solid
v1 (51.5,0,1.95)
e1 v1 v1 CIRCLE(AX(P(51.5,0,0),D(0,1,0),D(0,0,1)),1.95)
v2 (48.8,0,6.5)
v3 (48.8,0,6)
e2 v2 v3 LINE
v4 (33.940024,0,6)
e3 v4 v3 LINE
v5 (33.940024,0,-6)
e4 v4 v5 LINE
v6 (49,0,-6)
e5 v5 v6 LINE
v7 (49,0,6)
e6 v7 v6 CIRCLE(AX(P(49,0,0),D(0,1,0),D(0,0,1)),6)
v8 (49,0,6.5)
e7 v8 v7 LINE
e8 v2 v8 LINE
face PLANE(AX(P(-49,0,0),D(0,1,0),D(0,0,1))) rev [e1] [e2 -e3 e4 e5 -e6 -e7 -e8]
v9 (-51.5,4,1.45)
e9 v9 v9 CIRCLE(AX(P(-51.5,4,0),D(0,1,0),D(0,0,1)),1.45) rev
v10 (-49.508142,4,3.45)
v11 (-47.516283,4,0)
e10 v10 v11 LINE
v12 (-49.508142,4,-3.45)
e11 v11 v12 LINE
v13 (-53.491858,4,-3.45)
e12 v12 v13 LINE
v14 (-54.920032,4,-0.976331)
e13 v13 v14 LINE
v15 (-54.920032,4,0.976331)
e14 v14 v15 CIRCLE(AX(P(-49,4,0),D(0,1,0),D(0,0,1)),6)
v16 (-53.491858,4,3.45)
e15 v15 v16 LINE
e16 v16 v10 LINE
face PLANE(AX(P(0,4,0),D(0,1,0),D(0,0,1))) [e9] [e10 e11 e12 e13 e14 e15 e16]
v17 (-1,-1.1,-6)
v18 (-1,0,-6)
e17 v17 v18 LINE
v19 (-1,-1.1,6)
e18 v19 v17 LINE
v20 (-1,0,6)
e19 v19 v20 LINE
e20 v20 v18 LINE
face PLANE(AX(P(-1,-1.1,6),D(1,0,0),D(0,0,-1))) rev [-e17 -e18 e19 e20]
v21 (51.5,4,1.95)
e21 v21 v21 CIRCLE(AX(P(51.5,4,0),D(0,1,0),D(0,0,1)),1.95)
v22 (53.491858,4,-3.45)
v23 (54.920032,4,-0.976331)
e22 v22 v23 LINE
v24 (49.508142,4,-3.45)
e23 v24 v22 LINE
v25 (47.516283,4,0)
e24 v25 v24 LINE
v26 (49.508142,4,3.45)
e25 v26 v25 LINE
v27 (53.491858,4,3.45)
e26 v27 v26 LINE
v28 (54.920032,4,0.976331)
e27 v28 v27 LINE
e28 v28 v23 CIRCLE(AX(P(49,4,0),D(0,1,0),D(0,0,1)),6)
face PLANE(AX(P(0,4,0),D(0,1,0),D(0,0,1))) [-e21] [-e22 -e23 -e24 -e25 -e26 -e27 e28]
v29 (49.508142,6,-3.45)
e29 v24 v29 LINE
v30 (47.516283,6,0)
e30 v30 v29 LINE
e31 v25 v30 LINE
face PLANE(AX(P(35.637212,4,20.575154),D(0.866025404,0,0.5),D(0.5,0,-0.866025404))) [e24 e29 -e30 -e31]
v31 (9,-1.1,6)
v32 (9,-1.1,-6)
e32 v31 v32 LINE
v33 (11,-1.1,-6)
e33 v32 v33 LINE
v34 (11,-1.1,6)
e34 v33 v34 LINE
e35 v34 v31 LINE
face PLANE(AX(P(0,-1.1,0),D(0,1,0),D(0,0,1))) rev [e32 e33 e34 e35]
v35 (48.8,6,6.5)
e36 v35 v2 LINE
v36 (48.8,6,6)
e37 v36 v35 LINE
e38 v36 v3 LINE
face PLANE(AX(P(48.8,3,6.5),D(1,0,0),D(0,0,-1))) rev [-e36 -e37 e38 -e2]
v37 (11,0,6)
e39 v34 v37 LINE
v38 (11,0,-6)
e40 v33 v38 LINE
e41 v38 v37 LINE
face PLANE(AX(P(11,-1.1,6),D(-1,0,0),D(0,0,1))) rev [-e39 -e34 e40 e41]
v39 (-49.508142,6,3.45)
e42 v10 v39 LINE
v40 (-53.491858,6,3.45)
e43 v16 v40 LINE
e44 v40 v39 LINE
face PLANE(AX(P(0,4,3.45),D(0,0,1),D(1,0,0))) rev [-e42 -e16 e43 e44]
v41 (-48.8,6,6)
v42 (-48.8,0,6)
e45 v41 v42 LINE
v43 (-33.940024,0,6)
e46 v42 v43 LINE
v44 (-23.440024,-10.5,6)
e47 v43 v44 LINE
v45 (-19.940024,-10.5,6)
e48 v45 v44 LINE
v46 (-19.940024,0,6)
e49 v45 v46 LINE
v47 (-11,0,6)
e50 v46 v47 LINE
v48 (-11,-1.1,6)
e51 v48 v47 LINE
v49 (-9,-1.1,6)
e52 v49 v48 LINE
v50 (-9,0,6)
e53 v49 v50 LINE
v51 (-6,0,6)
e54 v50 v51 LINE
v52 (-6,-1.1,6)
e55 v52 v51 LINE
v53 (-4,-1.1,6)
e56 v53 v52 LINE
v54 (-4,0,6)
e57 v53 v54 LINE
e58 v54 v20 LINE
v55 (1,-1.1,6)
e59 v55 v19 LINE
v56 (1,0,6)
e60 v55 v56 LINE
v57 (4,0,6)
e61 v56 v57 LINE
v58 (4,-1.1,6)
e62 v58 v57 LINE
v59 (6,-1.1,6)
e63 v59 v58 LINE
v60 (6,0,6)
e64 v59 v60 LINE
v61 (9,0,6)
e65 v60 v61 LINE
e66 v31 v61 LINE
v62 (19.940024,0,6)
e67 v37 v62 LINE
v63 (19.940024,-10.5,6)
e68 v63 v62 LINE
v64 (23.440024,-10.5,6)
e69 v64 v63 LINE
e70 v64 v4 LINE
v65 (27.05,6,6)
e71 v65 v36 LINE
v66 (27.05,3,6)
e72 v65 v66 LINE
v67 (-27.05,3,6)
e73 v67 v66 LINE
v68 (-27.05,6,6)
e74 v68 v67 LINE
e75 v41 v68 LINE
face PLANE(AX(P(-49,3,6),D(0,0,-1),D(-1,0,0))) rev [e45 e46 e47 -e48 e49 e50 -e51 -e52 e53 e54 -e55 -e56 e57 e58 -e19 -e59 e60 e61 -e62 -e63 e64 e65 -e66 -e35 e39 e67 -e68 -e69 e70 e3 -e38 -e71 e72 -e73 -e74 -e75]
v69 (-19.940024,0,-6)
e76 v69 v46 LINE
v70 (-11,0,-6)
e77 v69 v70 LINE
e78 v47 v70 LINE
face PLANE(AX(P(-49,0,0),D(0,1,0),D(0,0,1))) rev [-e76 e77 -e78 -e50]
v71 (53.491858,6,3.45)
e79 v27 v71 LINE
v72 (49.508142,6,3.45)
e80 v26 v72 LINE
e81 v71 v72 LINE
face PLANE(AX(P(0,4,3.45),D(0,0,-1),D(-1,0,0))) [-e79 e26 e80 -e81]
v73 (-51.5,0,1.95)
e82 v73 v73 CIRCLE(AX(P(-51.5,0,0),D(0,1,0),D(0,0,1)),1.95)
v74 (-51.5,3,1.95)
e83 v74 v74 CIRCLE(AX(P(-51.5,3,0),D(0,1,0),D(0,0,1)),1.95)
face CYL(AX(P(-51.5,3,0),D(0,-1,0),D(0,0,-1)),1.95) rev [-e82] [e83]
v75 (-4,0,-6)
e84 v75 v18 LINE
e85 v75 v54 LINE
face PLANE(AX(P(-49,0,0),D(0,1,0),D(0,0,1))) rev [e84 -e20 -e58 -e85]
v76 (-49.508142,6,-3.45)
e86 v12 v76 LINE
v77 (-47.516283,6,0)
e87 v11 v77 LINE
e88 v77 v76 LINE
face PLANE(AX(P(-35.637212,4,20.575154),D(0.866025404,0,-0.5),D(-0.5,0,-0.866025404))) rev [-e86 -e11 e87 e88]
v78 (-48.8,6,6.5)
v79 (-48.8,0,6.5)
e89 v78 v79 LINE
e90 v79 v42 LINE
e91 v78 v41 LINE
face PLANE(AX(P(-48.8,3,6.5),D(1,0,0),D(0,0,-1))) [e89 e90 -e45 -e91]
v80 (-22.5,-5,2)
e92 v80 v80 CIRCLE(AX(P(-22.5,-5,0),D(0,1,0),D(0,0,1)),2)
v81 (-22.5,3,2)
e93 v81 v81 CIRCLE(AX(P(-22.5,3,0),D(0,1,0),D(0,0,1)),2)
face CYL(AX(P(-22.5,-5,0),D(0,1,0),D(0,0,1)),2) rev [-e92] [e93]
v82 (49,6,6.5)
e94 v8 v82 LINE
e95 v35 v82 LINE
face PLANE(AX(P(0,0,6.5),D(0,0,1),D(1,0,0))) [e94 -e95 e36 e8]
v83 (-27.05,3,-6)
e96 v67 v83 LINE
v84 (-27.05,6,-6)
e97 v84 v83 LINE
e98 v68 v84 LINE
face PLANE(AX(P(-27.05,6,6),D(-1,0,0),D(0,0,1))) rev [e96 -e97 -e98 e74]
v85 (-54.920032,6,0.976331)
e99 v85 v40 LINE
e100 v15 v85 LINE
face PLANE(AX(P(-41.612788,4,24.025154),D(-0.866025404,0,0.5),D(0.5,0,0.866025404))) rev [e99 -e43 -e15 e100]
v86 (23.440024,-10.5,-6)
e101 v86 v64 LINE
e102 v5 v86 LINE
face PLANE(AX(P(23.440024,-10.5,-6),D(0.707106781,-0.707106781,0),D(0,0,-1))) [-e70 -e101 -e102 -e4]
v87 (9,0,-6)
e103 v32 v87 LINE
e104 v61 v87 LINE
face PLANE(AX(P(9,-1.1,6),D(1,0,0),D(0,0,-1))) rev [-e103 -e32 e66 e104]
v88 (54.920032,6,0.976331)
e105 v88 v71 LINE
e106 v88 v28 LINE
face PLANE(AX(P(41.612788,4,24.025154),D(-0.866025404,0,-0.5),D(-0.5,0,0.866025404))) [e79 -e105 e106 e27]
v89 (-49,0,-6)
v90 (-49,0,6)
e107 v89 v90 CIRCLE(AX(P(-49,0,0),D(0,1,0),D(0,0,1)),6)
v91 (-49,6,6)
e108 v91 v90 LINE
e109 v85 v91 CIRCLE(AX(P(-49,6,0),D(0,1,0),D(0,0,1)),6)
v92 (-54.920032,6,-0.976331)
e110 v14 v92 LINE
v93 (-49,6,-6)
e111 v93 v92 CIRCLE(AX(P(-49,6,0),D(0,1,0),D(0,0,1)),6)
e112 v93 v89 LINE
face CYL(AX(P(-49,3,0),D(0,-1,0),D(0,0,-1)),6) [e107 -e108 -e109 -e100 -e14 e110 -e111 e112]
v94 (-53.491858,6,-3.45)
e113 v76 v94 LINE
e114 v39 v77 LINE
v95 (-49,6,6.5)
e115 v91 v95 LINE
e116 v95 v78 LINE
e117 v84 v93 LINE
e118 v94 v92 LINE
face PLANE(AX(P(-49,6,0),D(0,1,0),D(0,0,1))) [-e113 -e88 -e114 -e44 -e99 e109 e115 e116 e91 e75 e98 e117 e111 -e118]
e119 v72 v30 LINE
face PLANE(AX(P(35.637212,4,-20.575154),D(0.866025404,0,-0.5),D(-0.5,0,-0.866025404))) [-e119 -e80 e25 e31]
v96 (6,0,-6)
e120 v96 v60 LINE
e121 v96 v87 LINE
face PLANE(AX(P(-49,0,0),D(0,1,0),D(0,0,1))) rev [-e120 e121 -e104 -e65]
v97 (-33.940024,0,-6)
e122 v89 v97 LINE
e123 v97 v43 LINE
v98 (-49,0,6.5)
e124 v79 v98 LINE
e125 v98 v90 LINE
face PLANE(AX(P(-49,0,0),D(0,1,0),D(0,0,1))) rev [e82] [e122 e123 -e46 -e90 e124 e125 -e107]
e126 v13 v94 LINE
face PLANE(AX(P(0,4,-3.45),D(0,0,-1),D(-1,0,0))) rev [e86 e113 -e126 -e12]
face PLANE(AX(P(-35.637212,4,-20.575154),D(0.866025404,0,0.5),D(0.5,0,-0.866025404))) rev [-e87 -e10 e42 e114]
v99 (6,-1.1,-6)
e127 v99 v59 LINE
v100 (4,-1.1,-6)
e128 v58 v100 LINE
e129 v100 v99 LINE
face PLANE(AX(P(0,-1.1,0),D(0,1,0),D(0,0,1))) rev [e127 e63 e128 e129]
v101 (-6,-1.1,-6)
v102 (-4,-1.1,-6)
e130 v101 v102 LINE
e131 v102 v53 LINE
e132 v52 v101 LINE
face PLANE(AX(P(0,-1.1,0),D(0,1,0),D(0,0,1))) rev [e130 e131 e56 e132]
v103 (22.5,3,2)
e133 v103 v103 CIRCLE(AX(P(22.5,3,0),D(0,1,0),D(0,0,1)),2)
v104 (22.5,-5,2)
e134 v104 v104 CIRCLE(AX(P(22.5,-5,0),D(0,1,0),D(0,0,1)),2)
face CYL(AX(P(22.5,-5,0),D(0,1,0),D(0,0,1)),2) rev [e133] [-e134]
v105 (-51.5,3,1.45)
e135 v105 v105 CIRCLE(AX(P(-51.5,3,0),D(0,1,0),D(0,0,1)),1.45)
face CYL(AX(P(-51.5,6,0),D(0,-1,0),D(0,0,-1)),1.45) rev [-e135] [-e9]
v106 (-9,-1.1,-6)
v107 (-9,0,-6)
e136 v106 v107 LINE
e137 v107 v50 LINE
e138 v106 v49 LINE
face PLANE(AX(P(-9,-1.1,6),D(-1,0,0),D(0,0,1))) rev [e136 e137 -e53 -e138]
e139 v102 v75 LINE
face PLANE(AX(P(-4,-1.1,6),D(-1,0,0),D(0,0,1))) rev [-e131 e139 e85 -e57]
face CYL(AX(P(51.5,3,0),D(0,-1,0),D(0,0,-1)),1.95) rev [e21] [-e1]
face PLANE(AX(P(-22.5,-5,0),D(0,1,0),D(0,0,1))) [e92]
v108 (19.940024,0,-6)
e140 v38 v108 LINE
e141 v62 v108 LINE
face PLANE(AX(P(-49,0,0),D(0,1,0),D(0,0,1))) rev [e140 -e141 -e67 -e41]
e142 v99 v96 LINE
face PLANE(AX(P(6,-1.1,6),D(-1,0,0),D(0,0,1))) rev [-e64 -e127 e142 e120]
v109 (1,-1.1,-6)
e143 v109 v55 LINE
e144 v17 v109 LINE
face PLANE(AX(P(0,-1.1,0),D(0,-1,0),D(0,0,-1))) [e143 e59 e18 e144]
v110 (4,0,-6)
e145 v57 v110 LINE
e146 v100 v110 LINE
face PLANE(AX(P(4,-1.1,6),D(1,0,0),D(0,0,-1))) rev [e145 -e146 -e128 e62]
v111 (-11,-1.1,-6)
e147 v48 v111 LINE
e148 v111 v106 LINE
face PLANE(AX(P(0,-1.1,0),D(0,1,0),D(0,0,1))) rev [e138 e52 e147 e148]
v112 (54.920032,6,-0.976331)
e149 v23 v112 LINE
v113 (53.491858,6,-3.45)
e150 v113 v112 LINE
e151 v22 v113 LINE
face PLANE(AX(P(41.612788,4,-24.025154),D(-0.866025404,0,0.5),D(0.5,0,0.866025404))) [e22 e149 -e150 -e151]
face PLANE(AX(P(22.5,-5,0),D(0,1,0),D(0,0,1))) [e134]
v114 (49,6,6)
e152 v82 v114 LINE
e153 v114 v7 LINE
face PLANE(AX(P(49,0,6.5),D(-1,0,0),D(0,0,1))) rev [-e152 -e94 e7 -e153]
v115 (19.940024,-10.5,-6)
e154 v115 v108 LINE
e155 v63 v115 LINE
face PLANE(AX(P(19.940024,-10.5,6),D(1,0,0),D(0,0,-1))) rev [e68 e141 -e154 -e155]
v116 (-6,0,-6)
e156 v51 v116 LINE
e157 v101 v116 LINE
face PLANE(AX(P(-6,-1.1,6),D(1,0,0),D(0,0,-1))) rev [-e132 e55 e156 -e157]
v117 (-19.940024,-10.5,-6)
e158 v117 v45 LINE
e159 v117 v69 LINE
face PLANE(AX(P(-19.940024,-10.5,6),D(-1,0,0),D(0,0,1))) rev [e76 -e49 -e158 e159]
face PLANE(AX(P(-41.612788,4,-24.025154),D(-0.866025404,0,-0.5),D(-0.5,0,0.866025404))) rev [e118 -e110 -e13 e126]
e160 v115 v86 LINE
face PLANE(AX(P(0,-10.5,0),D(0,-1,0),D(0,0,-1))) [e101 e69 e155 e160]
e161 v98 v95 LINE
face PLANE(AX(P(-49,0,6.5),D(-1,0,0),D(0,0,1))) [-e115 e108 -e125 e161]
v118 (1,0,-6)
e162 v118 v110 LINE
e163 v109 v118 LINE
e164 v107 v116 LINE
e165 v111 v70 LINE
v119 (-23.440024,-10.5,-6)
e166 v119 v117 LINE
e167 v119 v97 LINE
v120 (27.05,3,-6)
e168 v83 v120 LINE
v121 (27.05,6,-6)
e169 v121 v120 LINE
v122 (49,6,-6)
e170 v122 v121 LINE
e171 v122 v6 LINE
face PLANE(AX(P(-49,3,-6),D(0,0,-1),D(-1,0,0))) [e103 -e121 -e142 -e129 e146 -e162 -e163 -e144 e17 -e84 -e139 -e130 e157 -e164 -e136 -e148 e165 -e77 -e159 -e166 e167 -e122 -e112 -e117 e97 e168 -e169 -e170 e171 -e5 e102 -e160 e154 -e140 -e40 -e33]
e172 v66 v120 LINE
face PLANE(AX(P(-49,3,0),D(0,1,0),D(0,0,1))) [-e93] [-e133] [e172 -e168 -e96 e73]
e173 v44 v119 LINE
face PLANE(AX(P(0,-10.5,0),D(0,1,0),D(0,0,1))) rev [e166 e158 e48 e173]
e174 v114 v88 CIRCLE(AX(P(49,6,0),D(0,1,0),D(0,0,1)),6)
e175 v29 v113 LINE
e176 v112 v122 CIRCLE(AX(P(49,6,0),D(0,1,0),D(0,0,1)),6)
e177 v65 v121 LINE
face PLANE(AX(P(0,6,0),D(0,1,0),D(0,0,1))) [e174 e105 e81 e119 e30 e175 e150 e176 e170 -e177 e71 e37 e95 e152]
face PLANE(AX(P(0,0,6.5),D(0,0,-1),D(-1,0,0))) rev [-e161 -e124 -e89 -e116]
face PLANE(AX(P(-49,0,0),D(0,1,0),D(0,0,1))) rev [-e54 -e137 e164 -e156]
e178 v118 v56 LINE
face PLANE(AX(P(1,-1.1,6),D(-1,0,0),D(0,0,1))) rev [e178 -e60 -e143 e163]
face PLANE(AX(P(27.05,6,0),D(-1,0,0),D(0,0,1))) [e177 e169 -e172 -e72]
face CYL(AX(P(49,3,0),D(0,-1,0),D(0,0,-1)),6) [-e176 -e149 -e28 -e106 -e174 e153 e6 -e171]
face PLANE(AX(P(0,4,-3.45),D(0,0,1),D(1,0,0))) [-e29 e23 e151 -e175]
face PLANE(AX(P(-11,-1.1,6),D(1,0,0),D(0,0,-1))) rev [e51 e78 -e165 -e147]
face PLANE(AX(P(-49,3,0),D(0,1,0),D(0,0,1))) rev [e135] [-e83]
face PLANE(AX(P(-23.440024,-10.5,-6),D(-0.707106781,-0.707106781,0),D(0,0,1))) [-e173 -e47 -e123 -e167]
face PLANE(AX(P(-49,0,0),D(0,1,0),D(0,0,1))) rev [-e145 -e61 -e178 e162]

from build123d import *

# Parameters (mm, degrees)
SKETCH1_R                 = 1.95
BOSS_EXTRUDE1_DEPTH       = 3
SKETCH4_W                 = 3.5
SKETCH4_H                 = 12
BOSS_EXTRUDE3_DEPTH       = 10.5
SKETCH5_W                 = 2
SKETCH5_H                 = 12
BOSS_EXTRUDE4_DEPTH       = 1.1
SKETCH6_W                 = 0.2
SKETCH6_H                 = 3
BOSS_EXTRUDE5_DEPTH       = 0.5
CHAMFER1_SIZE             = 10.5
BOSS_EXTRUDE6_OUTLINE_R   = 1.95
BOSS_EXTRUDE6_OUTLINE_R_2 = 1.45
BOSS_EXTRUDE6_DEPTH       = 3
CUT_EXTRUDE1_START        = -2
SKETCH11_R                = 1.45
CUT_EXTRUDE1_DEPTH        = 2
SKETCH13_R                = 2
CUT_EXTRUDE2_DEPTH        = 8


# Read off the part's stored shape, not the designer's step: Boss-Extrude6
with BuildPart() as part:
    # Sketch1 → Boss-Extrude1 (new body)
    with BuildSketch(Plane(origin=(0, 0, 0), x_dir=(1, 0, 0), z_dir=(0, 1, 0))):
        with BuildLine():
            Line((-49, 6), (49, 6))
            ThreePointArc((49, 6), (55, 0), (49, -6))
            Line((49, -6), (-49, -6))
            ThreePointArc((-49, -6), (-55, 0), (-49, 6))
        make_face()
        with Locations(Location((-51.5, 0, 0), (0, 0, 270))):
            Circle(SKETCH1_R, mode=Mode.SUBTRACT)
        with Locations(Location((51.5, 0, 0), (0, 0, 270))):
            Circle(SKETCH1_R, mode=Mode.SUBTRACT)
    extrude(amount=BOSS_EXTRUDE1_DEPTH)

    # Sketch4 → Boss-Extrude3 (add)
    with BuildSketch(Plane.XZ):
        with Locations((-21.690023983, 0)):
            Rectangle(SKETCH4_W, SKETCH4_H)
        with Locations((21.690023983, 0)):
            Rectangle(SKETCH4_W, SKETCH4_H)
    extrude(amount=BOSS_EXTRUDE3_DEPTH)

    # Sketch5 → Boss-Extrude4 (add)
    with BuildSketch(Plane.XZ):
        with Locations((5, 0)):
            Rectangle(SKETCH5_W, SKETCH5_H)
        Rectangle(SKETCH5_W, SKETCH5_H)
        with Locations((10, 0)):
            Rectangle(SKETCH5_W, SKETCH5_H)
        with Locations((-5, 0)):
            Rectangle(SKETCH5_W, SKETCH5_H)
        with Locations((-10, 0)):
            Rectangle(SKETCH5_W, SKETCH5_H)
    extrude(amount=BOSS_EXTRUDE4_DEPTH)

    # Sketch6 → Boss-Extrude5 (add)
    with BuildSketch(Plane.XY.offset(6)):
        with Locations((48.9, 1.5)):
            Rectangle(SKETCH6_W, SKETCH6_H)
        with Locations((-48.9, 1.5)):
            Rectangle(SKETCH6_W, SKETCH6_H)
    extrude(amount=BOSS_EXTRUDE5_DEPTH)

    # Chamfer1
    chamfer1_edges = [part.edges().sort_by_distance(p)[0] for p in [
        (23.440023983, 0, 0),
        (-23.440023983, 0, 0),
    ]]
    chamfer(chamfer1_edges, length=CHAMFER1_SIZE - 0.0001)  # a hair under: the kernel refuses the full size

    # Boss-Extrude6 outline → Boss-Extrude6 (add)
    # profile 1 of 2: a face of its own
    with BuildSketch(Plane(origin=(0, 3, 0), x_dir=(1, 0, 0), z_dir=(0, 1, 0))):
        with BuildLine():
            Line((27.05, -6), (48.8, -6))
            Line((48.8, -6), (48.8, -6.5))
            Line((48.8, -6.5), (49, -6.5))
            Line((49, -6.5), (49, -6))
            ThreePointArc((49, -6), (55, 0), (49, 6))
            Line((49, 6), (27.05, 6))
            Line((27.05, 6), (27.05, -6))
        make_face()
        with Locations((51.5, 0)):
            Circle(BOSS_EXTRUDE6_OUTLINE_R, mode=Mode.SUBTRACT)
    # profile 2 of 2: a face of its own
    with BuildSketch(Plane(origin=(0, 3, 0), x_dir=(1, 0, 0), z_dir=(0, 1, 0))):
        with BuildLine():
            Line((-48.8, -6), (-27.05, -6))
            Line((-27.05, -6), (-27.05, 6))
            Line((-27.05, 6), (-49, 6))
            ThreePointArc((-49, 6), (-55, 0), (-49, -6))
            Line((-49, -6), (-49, -6.5))
            Line((-49, -6.5), (-48.8, -6.5))
            Line((-48.8, -6.5), (-48.8, -6))
        make_face()
        with Locations((-51.5, 0)):
            Circle(BOSS_EXTRUDE6_OUTLINE_R_2, mode=Mode.SUBTRACT)
    extrude(amount=BOSS_EXTRUDE6_DEPTH)

    # Sketch11 → Cut-Extrude1 (cut)
    # profile 1 of 2: a face of its own
    with BuildSketch(Plane(origin=(0, 6, 0), x_dir=(1, 0, 0), z_dir=(0, 1, 0)).offset(CUT_EXTRUDE1_START)):
        Polygon((53.491858429, 3.45), (55.483716857, 0), (53.491858429, -3.45), (49.508141571, -3.45), (47.516283143, 0), (49.508141571, 3.45), align=None)
    # profile 2 of 2: a face of its own
    with BuildSketch(Plane(origin=(0, 6, 0), x_dir=(1, 0, 0), z_dir=(0, 1, 0)).offset(CUT_EXTRUDE1_START)):
        Polygon((-47.516283143, 0), (-49.508141571, 3.45), (-53.491858429, 3.45), (-55.483716857, 0), (-53.491858429, -3.45), (-49.508141571, -3.45), align=None)
        with Locations(Location((-51.5, 0, 0), (0, 0, 270))):
            Circle(SKETCH11_R, mode=Mode.SUBTRACT)
    extrude(amount=CUT_EXTRUDE1_DEPTH, mode=Mode.SUBTRACT)

    # Sketch13 → Cut-Extrude2 (cut)
    with BuildSketch(Plane(origin=(0, 3, 0), x_dir=(1, 0, 0), z_dir=(0, 1, 0))):
        with Locations(Location((22.5, 0, 0), (0, 0, 270))):
            Circle(SKETCH13_R)
        with Locations(Location((-22.5, 0, 0), (0, 0, 270))):
            Circle(SKETCH13_R)
    extrude(amount=-CUT_EXTRUDE2_DEPTH, mode=Mode.SUBTRACT)


solid = part.part
